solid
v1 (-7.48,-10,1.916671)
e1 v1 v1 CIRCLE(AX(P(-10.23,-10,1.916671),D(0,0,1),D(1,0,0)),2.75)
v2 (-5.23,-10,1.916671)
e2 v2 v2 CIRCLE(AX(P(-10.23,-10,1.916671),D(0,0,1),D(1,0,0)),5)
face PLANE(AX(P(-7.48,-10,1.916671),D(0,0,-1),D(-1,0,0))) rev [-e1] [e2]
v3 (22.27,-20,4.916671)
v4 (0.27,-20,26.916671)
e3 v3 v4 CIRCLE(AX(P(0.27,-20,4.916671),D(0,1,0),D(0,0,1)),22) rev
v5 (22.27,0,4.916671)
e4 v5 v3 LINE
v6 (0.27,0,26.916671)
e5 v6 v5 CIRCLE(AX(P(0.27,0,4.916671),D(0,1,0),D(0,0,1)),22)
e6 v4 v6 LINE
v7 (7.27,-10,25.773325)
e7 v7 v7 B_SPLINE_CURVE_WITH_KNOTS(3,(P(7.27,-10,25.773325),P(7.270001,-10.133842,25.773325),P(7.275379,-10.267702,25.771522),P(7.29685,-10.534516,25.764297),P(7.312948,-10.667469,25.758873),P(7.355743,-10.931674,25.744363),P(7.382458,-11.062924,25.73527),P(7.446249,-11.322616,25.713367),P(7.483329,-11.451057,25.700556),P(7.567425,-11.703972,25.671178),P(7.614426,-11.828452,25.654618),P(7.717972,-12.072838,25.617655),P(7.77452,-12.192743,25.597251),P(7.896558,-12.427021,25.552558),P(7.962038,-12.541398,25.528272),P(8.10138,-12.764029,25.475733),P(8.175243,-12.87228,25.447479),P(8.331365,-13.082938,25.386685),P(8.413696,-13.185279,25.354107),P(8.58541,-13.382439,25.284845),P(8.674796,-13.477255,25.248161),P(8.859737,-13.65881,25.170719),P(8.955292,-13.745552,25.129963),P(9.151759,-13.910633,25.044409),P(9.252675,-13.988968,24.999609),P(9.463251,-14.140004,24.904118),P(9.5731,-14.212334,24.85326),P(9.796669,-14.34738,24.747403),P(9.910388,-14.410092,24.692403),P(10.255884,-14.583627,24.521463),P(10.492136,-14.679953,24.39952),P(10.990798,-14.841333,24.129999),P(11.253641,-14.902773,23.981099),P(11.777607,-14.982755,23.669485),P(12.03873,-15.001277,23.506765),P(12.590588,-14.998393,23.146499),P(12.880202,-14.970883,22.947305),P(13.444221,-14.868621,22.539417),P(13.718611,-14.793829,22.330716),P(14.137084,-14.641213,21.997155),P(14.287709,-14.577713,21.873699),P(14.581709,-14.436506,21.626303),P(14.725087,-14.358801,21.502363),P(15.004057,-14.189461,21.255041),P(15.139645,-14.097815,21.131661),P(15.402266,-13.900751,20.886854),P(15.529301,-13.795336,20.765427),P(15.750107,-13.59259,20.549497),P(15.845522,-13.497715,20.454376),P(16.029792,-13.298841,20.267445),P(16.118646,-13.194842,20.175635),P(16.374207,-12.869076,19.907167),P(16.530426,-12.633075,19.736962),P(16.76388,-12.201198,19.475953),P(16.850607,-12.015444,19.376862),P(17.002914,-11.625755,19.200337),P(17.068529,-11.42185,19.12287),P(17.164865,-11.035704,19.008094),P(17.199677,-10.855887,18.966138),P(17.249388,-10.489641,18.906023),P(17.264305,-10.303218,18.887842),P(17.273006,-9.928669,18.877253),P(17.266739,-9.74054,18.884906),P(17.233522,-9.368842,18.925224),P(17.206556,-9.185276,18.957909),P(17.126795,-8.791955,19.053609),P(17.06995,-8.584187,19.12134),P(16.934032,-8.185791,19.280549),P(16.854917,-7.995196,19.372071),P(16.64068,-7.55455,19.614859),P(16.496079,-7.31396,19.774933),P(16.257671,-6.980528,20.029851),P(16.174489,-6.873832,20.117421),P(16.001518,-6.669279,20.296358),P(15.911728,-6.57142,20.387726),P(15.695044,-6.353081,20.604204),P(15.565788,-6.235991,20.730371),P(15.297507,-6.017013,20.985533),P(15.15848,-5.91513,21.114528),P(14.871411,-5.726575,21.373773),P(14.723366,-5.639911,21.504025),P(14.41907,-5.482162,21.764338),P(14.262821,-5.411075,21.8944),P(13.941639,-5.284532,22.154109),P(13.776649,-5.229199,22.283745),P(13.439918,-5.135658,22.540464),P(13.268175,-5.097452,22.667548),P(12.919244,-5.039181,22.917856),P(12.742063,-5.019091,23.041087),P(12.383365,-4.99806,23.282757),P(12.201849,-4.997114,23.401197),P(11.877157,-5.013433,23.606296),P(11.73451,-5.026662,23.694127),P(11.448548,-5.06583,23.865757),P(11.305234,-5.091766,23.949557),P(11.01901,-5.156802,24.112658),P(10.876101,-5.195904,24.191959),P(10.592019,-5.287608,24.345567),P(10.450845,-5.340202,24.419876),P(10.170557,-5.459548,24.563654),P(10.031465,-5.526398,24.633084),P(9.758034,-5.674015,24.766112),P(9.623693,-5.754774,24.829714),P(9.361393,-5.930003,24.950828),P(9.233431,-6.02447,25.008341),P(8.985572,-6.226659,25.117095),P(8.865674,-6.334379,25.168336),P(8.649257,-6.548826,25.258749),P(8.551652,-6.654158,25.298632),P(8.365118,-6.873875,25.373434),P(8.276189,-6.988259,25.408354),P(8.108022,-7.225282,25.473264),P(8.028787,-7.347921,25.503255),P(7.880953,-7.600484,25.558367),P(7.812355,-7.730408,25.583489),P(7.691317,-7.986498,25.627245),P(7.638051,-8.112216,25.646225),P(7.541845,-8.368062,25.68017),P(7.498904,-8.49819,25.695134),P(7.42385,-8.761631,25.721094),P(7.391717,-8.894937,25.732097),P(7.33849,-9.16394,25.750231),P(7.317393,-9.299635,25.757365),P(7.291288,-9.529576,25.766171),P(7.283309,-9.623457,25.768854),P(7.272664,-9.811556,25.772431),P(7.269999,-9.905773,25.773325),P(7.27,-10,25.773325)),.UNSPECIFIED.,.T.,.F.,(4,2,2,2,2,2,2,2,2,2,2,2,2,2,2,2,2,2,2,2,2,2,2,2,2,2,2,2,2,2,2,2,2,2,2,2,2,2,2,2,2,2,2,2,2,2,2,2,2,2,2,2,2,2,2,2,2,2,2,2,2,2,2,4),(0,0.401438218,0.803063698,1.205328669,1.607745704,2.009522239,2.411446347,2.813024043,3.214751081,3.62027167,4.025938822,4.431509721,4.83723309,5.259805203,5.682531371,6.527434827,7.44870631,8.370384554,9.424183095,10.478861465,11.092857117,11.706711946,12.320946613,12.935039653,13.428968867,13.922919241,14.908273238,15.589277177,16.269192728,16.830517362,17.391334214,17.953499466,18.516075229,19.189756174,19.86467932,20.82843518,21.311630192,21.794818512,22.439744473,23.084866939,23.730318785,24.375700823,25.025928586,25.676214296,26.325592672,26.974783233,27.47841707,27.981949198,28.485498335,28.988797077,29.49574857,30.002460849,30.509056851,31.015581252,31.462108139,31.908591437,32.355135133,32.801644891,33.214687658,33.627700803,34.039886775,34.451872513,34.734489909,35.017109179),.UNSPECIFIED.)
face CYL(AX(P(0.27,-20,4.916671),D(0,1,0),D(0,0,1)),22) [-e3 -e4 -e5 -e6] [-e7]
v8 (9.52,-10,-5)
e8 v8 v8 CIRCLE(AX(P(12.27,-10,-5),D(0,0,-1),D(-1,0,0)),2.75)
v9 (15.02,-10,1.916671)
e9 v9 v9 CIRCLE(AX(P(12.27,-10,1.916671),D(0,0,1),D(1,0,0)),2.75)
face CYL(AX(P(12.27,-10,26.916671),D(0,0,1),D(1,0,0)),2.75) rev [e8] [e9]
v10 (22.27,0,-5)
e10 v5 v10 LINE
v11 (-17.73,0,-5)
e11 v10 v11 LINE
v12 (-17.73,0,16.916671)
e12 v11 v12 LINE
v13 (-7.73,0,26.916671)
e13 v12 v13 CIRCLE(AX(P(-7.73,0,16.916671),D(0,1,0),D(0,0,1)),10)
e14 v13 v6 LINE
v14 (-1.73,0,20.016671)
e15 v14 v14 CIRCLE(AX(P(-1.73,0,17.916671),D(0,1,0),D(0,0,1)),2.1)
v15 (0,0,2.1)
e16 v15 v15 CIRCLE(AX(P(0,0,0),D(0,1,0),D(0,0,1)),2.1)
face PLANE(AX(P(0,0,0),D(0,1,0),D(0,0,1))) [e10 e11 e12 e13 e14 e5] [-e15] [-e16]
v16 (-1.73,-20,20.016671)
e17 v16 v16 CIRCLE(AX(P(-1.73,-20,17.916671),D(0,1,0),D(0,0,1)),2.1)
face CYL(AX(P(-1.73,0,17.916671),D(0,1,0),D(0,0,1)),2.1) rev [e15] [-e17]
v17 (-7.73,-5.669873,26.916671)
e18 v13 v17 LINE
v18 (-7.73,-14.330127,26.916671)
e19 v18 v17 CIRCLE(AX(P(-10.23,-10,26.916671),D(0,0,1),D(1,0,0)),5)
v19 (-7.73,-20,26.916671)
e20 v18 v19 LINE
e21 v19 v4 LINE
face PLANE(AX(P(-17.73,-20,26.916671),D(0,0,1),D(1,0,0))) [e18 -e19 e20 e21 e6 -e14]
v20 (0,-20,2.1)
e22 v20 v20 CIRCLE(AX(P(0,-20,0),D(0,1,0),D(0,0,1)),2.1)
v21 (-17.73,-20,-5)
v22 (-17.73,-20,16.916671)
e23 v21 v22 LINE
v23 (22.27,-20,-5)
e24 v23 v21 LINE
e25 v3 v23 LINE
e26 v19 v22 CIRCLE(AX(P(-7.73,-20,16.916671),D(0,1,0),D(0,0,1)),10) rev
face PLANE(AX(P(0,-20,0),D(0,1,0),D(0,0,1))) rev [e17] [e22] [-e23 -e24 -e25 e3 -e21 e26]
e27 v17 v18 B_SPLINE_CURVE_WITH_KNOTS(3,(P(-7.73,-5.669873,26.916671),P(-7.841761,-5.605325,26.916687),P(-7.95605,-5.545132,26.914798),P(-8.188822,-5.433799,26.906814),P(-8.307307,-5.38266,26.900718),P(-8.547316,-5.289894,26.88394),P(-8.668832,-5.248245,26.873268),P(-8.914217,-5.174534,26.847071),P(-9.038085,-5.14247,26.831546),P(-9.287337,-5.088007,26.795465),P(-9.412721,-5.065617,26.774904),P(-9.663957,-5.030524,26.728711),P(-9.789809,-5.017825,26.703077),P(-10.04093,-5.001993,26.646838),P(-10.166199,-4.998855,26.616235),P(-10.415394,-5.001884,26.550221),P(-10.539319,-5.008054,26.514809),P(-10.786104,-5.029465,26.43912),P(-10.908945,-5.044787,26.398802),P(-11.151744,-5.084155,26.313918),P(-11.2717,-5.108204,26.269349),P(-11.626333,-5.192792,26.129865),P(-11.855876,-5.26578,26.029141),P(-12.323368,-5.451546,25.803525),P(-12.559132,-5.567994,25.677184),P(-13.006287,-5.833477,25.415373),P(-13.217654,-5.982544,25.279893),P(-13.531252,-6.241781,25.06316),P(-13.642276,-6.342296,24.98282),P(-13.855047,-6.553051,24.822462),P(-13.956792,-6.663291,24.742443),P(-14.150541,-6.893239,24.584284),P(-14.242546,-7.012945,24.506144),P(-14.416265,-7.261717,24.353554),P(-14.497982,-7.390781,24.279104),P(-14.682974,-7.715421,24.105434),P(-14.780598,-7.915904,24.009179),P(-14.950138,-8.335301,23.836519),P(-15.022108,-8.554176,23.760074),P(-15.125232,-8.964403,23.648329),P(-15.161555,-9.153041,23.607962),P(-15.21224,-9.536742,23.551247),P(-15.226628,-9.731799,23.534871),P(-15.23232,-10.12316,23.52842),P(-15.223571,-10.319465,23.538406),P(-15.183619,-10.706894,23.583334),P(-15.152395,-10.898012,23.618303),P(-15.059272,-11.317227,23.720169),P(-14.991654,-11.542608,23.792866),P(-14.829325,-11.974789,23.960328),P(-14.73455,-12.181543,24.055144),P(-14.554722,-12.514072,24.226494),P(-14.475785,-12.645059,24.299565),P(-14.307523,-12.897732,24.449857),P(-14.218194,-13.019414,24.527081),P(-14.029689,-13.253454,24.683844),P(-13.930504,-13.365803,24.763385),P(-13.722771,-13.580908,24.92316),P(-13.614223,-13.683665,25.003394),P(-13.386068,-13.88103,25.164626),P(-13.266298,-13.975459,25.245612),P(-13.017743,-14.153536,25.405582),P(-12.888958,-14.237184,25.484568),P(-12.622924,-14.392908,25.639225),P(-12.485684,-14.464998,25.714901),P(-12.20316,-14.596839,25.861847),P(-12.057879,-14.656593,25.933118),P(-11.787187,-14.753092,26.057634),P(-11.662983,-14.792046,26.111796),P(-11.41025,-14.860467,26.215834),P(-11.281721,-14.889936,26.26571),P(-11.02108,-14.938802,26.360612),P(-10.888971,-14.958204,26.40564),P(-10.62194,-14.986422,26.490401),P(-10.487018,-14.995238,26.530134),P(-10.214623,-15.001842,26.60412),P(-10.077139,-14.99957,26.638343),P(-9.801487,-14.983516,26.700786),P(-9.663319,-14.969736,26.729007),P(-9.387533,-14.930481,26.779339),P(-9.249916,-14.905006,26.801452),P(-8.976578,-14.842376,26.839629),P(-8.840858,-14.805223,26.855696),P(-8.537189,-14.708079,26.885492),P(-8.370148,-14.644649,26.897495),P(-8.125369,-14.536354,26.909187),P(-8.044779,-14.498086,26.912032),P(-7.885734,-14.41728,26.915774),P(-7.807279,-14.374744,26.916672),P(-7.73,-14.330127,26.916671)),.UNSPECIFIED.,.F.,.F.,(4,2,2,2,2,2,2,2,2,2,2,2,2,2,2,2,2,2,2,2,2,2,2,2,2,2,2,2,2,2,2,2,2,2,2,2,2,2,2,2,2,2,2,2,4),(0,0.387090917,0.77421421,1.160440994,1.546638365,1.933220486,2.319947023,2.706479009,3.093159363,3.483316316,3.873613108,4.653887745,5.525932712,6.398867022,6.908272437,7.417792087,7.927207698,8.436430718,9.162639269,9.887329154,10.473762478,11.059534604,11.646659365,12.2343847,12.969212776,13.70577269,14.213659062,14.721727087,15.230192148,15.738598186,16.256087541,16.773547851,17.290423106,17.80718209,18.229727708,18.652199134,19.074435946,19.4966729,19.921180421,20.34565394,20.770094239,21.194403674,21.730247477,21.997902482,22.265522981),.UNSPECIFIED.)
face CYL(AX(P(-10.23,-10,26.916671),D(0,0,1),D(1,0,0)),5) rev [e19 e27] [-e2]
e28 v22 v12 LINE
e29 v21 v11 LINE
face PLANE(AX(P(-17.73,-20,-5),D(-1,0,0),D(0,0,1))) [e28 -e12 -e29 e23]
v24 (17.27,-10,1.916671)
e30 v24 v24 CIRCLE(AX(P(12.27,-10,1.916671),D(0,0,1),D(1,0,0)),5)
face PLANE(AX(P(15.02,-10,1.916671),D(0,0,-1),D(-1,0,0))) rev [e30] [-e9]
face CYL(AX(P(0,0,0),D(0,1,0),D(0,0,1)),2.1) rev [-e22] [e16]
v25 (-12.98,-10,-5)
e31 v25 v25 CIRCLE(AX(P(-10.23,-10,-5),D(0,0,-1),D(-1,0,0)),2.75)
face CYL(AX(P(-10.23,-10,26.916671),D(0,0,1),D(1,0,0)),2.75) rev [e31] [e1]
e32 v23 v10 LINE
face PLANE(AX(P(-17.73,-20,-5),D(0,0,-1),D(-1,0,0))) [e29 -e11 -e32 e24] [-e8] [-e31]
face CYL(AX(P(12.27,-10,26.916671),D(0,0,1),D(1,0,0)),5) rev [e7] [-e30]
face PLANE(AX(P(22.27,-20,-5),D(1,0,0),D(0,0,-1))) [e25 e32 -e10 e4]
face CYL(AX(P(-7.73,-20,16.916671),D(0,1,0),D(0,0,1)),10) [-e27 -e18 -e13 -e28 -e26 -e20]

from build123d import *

# Parameters (mm, degrees)
SKETCH2_W                      = 40
SKETCH2_H                      = 31.916671008
BOSS_EXTRUDE1_DEPTH            = 20
CBORE_FOR_M5_SHCS1_D           = 5.5
CBORE_FOR_M5_SHCS1_CBORE_D     = 10
CBORE_FOR_M5_SHCS1_CBORE_DEPTH = 25
M5X0_8_TAPPED_HOLE1_D          = 4.2
FILLET1_R                      = 22
FILLET2_START                  = -21
FILLET2_DEPTH                  = 22


with BuildPart() as part:
    # Sketch2 → Boss-Extrude1 (new body)
    with BuildSketch(Plane(origin=(0, 0, 0), x_dir=(1, 0, 0), z_dir=(0, 1, 0))):
        with Locations((2.27, -10.958335504)):
            Rectangle(SKETCH2_W, SKETCH2_H)
    extrude(amount=-BOSS_EXTRUDE1_DEPTH)

    # CBORE for M5 SHCS1 (through all)
    with Locations(Plane.XY.offset(26.916671008)):
        with Locations((-10.23, -10), (12.27, -10)):
            CounterBoreHole(CBORE_FOR_M5_SHCS1_D / 2, CBORE_FOR_M5_SHCS1_CBORE_D / 2, CBORE_FOR_M5_SHCS1_CBORE_DEPTH)

    # M5x0.8 Tapped Hole1 (through all)
    with Locations(Plane(origin=(0, 0, 0), x_dir=(1, 0, 0), z_dir=(0, 1, 0))):
        with Locations((-1.73, -17.916671008), (0, 0)):
            Hole(M5X0_8_TAPPED_HOLE1_D / 2)

    # Fillet1
    # the kernel refuses this fillet: 22 mm, written as the material it takes off along each edge
    with BuildSketch(Plane(origin=(22.27, 55, 26.916671008), x_dir=(0, 0, -1), z_dir=(0, -1, 0))) as fillet1_piece_1:
        with BuildLine():
            CenterArc((FILLET1_R, -FILLET1_R), FILLET1_R, 90, 90)
            Line((0, -FILLET1_R), (0, 0))
            Line((0, 0), (FILLET1_R, 0))
        make_face()
    extrude(amount=130, mode=Mode.SUBTRACT)

    # Fillet2: read off the stored shape, not the designer's step
    # Fillet2 outline → Fillet2 (cut)
    with BuildSketch(Plane(origin=(0, 0, 0), x_dir=(1, 0, 0), z_dir=(0, 1, 0)).offset(FILLET2_START)):
        with BuildLine():
            ThreePointArc((-7.73, -26.916671008), (-14.801067812, -23.98773882), (-17.73, -16.916671008))
            Line((-17.73, -16.916671008), (-17.73, -26.916671008))
            Line((-17.73, -26.916671008), (-7.73, -26.916671008))
        make_face()
    extrude(amount=FILLET2_DEPTH, mode=Mode.SUBTRACT)


solid = part.part
